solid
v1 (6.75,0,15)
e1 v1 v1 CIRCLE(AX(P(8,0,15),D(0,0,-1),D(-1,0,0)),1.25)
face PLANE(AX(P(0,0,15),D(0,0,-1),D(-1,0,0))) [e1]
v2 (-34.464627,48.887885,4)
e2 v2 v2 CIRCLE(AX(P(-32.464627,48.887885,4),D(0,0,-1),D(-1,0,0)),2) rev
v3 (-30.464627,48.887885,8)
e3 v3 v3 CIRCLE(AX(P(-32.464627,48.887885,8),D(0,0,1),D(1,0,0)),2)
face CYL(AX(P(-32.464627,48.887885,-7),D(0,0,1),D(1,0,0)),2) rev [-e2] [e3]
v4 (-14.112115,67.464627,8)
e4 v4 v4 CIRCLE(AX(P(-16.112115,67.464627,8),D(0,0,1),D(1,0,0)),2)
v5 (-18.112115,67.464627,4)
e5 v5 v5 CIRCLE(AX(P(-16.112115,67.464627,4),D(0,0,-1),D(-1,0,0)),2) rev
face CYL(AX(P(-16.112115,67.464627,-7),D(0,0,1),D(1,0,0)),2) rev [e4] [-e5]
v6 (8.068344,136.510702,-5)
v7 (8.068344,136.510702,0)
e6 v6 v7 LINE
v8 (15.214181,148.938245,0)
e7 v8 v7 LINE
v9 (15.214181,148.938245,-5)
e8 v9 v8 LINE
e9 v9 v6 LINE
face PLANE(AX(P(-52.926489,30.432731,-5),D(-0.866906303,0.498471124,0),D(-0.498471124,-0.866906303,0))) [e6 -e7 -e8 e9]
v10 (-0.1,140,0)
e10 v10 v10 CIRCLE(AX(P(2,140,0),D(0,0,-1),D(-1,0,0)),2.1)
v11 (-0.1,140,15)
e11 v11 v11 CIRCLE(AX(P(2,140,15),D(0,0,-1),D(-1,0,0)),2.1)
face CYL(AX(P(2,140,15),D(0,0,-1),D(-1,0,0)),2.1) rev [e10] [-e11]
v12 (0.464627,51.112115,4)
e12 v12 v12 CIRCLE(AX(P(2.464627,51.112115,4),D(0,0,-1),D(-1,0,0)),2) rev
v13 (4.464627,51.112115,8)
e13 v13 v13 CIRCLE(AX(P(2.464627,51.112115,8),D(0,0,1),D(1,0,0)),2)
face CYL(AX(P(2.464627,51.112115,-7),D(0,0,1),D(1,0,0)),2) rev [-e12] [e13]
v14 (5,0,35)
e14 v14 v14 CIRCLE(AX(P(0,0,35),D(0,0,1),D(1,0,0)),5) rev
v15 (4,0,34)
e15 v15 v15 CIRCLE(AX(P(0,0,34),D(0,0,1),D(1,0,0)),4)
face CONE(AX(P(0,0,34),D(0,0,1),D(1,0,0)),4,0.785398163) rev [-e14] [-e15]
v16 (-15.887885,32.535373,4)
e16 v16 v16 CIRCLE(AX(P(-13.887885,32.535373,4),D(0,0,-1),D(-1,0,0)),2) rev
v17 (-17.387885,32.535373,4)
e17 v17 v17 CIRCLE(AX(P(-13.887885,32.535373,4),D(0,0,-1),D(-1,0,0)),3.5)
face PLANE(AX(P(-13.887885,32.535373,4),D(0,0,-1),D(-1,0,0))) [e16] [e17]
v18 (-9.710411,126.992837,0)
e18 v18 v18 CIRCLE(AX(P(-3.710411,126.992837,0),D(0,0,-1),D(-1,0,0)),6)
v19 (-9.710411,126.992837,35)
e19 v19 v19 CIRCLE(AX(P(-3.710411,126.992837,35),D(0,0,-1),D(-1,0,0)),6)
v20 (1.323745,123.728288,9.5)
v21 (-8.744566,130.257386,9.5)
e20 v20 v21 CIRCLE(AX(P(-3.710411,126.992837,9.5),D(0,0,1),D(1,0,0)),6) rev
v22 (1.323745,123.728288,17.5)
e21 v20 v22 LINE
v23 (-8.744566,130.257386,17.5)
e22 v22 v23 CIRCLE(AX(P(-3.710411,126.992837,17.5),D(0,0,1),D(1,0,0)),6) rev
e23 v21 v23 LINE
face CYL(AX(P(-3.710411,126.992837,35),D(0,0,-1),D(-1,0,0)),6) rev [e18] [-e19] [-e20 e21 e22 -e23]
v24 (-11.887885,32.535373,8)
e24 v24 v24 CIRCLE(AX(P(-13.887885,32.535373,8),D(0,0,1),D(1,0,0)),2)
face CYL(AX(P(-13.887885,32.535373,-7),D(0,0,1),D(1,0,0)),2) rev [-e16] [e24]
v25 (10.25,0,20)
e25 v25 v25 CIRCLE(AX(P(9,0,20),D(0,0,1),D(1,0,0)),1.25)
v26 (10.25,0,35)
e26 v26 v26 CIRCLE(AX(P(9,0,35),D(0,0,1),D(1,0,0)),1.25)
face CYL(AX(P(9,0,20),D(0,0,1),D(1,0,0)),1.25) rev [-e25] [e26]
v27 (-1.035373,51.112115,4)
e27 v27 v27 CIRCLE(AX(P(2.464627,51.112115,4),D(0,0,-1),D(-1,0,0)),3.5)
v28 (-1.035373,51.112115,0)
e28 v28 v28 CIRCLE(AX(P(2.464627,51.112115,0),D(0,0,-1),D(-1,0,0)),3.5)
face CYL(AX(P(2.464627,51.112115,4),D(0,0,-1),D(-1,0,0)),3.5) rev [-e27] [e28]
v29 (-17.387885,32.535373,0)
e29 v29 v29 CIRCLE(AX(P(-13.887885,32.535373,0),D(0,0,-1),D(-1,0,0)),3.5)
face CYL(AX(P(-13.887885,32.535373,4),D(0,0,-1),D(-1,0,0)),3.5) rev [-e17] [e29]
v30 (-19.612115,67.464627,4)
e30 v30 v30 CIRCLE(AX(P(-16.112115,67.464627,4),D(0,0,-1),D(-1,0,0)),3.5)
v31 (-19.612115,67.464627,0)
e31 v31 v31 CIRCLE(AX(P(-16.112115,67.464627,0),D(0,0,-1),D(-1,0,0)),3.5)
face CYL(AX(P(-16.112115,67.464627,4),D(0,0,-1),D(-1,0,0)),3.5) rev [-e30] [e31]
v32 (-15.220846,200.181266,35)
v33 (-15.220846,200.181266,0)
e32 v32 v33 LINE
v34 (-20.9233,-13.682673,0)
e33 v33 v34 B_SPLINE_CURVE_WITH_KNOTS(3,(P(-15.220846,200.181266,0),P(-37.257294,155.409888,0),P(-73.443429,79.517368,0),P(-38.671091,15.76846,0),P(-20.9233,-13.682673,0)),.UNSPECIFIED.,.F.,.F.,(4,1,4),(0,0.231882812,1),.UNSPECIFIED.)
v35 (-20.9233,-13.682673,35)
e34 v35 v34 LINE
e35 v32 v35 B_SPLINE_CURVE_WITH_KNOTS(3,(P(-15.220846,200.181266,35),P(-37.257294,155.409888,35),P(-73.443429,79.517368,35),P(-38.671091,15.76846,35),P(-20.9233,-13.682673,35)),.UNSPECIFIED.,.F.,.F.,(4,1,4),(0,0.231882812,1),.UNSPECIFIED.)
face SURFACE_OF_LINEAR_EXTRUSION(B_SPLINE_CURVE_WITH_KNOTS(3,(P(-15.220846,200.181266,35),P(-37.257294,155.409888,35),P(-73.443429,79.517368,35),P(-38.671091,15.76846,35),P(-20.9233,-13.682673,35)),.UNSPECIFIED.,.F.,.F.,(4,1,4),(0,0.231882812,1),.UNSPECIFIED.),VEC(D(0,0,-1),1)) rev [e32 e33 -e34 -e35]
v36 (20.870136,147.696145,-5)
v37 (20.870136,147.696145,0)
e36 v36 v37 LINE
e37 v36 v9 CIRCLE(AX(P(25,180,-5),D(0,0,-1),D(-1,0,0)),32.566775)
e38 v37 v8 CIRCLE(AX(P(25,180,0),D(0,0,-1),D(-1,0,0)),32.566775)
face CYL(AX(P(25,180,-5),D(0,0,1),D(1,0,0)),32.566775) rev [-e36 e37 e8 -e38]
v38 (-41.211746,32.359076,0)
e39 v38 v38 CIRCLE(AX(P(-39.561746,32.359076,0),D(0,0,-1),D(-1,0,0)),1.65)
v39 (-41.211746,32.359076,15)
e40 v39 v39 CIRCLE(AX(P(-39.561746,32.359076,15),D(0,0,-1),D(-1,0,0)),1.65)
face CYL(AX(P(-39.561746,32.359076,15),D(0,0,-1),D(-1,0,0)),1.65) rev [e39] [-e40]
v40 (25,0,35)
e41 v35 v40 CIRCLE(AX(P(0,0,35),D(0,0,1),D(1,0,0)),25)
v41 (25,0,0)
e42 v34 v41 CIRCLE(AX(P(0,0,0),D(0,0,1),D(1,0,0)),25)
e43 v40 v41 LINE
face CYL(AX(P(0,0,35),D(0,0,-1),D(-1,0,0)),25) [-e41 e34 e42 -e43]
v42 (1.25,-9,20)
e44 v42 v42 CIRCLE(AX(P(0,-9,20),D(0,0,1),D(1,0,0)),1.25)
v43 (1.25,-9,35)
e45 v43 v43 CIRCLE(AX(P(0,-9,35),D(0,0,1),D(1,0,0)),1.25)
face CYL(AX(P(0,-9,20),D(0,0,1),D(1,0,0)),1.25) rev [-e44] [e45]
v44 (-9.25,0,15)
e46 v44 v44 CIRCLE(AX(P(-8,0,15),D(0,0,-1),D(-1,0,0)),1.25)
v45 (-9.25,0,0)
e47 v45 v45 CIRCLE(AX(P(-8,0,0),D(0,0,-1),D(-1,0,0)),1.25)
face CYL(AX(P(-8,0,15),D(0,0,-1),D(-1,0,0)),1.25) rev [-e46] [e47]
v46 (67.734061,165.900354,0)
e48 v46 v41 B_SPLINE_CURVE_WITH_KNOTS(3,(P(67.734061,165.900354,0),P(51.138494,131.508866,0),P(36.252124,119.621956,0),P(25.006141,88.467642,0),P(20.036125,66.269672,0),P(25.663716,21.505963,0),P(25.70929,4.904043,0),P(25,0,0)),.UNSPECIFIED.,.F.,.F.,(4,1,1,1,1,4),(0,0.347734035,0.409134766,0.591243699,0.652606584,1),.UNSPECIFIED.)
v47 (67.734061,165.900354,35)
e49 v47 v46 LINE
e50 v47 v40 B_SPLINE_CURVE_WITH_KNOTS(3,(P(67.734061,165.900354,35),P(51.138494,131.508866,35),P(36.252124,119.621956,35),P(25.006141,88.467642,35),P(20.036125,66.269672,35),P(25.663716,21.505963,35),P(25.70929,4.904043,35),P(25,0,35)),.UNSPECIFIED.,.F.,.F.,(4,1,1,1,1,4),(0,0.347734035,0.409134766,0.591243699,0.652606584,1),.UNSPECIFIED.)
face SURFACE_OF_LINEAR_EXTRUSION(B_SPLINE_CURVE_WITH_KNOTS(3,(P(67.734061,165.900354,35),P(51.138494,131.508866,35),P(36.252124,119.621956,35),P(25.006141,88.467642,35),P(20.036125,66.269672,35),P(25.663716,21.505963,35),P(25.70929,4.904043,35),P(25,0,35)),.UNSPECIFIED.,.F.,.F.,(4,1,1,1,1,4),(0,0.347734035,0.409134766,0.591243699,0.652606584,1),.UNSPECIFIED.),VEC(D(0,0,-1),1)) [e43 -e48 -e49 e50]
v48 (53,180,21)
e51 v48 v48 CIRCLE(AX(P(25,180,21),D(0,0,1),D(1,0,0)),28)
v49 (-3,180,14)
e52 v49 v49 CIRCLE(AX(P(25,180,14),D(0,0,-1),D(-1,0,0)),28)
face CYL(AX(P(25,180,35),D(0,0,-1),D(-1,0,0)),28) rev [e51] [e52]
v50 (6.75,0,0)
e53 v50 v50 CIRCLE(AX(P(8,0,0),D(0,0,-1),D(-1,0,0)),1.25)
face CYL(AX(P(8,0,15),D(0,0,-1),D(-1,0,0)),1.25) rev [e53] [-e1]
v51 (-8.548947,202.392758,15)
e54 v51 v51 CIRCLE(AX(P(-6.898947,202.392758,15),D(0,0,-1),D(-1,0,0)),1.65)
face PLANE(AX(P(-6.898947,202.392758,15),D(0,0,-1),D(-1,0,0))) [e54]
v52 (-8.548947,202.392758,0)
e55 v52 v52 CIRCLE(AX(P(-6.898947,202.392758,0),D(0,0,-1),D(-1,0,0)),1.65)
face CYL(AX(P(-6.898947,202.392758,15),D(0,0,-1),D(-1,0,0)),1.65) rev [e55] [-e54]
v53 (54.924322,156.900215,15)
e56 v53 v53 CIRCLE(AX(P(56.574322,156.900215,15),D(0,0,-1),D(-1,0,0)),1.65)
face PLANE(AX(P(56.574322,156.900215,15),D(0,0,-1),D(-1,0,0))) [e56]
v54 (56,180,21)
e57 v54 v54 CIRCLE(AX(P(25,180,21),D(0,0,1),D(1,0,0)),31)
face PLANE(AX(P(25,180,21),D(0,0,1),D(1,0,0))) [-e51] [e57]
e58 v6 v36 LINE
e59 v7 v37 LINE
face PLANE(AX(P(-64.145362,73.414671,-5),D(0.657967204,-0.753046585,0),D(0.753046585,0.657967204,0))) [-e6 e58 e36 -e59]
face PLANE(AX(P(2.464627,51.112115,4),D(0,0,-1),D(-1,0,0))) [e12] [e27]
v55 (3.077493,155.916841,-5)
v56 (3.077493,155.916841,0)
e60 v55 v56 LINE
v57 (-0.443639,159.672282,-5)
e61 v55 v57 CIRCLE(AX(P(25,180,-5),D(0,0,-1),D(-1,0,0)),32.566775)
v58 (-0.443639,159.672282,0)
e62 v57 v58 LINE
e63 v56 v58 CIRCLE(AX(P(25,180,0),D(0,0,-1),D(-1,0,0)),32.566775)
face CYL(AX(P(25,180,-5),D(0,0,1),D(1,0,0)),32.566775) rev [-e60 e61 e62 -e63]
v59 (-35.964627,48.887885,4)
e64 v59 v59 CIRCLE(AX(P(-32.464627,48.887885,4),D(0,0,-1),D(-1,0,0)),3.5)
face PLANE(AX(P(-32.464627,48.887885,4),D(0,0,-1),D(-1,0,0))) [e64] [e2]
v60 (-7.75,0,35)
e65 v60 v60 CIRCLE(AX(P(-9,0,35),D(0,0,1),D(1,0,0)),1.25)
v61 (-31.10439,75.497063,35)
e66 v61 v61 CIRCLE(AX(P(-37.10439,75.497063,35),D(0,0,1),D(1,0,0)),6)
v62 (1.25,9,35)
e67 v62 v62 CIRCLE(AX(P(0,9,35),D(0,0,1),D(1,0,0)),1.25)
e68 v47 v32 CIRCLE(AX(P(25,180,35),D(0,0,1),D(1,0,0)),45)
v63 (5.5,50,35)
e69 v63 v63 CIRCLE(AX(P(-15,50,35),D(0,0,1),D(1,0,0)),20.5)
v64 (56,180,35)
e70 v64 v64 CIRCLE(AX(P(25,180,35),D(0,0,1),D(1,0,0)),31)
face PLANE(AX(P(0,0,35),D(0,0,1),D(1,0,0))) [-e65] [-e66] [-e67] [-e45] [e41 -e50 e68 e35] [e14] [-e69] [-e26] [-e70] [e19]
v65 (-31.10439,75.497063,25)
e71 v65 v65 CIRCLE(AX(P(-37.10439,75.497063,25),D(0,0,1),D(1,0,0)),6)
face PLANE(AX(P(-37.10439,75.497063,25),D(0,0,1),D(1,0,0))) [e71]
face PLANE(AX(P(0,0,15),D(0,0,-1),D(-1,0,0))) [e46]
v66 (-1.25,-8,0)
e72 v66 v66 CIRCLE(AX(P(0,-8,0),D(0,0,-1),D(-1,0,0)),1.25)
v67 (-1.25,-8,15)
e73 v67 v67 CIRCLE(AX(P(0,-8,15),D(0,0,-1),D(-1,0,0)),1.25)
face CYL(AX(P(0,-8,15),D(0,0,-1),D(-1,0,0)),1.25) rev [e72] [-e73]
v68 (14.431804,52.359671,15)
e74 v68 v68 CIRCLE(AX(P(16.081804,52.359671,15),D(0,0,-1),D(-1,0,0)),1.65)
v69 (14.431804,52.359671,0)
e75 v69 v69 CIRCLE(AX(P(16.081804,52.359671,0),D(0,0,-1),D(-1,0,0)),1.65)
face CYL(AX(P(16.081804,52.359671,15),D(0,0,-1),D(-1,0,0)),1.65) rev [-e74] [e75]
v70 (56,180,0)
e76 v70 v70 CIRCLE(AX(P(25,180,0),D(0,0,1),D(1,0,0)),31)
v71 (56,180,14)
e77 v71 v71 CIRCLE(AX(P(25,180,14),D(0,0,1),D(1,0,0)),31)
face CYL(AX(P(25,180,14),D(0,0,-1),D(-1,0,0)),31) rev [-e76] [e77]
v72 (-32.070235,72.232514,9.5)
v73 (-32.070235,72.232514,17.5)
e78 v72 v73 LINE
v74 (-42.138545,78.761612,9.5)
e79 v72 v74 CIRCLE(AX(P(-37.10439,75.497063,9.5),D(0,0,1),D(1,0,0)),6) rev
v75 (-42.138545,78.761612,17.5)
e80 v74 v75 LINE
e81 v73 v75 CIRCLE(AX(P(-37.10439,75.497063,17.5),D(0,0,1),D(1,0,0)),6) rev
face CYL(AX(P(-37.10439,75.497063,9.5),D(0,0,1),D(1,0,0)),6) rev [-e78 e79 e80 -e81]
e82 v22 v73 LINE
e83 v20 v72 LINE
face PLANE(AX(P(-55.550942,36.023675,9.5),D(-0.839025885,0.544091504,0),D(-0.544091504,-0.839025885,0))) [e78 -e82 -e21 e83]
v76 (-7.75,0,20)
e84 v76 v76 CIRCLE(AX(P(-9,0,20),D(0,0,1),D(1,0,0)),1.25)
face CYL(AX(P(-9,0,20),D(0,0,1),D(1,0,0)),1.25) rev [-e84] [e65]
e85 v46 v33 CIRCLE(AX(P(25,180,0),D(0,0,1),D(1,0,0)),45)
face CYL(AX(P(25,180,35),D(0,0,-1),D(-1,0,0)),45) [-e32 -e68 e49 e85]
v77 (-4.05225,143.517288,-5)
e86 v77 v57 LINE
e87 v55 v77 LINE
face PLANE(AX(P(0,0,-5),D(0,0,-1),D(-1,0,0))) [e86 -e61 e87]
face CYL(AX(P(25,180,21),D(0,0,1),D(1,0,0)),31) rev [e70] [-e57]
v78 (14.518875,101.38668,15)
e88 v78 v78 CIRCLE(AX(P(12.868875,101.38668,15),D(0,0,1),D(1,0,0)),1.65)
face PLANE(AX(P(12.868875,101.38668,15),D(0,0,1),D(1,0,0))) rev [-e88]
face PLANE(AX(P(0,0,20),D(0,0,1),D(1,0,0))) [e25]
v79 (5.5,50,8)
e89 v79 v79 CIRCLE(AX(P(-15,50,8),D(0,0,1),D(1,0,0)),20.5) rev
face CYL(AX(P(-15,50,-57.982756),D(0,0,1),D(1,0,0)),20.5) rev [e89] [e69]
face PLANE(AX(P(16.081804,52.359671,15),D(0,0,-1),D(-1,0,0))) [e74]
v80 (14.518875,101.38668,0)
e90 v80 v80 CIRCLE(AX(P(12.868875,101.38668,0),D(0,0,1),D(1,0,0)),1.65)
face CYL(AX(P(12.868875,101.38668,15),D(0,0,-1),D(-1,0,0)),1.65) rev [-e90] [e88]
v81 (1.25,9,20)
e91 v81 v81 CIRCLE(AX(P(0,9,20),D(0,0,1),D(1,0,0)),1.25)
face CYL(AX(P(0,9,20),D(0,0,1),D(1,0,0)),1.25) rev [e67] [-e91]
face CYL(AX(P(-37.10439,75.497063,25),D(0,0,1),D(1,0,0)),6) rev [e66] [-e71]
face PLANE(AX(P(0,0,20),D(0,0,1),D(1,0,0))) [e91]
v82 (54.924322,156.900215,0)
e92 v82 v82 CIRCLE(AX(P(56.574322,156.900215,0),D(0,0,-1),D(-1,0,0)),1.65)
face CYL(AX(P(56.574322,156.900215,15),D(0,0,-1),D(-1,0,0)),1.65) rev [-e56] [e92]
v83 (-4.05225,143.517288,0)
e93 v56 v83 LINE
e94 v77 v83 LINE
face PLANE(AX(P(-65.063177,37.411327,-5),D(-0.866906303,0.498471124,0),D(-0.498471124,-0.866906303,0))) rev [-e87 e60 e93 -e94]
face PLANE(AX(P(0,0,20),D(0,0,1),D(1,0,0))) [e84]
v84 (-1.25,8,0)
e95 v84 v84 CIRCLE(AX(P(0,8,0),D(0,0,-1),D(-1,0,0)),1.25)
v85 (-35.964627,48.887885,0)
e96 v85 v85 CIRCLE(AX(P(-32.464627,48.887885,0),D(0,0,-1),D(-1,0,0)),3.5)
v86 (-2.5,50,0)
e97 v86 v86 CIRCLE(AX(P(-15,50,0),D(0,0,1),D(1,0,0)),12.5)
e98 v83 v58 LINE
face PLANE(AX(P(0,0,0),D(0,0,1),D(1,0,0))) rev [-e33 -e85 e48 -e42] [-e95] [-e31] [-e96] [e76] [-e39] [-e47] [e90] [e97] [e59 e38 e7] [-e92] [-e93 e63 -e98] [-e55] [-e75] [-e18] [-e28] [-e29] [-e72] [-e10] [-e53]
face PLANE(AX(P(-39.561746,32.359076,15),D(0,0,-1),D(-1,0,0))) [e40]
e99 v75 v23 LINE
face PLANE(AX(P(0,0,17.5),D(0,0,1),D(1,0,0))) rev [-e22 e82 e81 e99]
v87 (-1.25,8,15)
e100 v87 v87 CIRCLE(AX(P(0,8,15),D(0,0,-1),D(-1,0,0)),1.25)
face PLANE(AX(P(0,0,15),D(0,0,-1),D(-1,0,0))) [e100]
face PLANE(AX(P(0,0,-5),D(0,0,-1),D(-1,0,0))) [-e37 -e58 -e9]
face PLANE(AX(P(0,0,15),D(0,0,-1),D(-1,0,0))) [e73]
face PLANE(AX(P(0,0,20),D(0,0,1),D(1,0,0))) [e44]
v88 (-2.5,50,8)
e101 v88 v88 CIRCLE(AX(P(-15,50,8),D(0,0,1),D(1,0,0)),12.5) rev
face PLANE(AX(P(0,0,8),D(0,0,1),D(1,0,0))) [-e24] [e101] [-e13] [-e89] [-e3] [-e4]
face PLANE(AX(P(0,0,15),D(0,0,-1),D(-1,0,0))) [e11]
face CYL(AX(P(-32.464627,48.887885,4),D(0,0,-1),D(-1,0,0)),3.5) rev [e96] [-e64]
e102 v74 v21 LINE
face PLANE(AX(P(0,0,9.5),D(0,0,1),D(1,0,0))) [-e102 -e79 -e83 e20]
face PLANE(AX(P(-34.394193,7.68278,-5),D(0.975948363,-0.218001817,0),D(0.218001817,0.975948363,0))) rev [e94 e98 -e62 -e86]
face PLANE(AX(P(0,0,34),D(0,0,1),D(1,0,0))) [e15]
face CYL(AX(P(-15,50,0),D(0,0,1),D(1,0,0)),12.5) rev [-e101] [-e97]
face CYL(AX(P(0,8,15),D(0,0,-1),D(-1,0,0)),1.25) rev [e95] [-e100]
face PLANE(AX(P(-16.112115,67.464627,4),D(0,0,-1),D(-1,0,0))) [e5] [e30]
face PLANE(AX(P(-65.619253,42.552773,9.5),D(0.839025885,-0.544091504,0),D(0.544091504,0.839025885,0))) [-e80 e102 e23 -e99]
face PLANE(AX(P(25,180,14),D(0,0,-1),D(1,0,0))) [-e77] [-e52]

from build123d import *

# Parameters (mm, degrees)
SKIZZE1_R                        = 9
SKIZZE1_R_2                      = 28
AUFSATZ_LINEAR_AUSTRAGEN1_DEPTH  = 35
SKIZZE2_R                        = 4
SCHNITT_LINEAR_AUSTRAGEN1_DEPTH  = 1
FASE1_SIZE                       = 1
SKIZZE4_R                        = 1.25
SCHNITT_LINEAR_AUSTRAGEN2_DEPTH  = 15
SKIZZE5_R                        = 1.25
SCHNITT_LINEAR_AUSTRAGEN3_DEPTH  = 15
SKIZZE6_R                        = 12.5
SCHNITT_LINEAR_AUSTRAGEN4_DEPTH  = 35
SKIZZE7_R                        = 20.5
SCHNITT_LINEAR_AUSTRAGEN5_DEPTH  = 27
SKIZZE8_R                        = 2
SCHNITT_LINEAR_AUSTRAGEN6_DEPTH  = 15
SKIZZE9_R                        = 3.5
SCHNITT_LINEAR_AUSTRAGEN7_DEPTH  = 4
SKIZZE10_R                       = 31
SCHNITT_LINEAR_AUSTRAGEN8_DEPTH  = 14
SKIZZE11_R                       = 1.65
SCHNITT_LINEAR_AUSTRAGEN10_DEPTH = 15
SKIZZE12_R                       = 2.1
SCHNITT_LINEAR_AUSTRAGEN11_DEPTH = 15
BOSS_EXTRUDE1_DEPTH              = 5
SKETCH2_R                        = 6
CUT_EXTRUDE1_DEPTH               = 35
CUT_EXTRUDE2_START               = 8
SKETCH3_R                        = 6
CUT_EXTRUDE2_DEPTH               = 8
CUT_EXTRUDE3_START               = -10
SKETCH4_R                        = 6
CUT_EXTRUDE3_DEPTH               = 10
SKIZZE13_R                       = 1.65
SCHNITT_LINEAR_AUSTRAGEN12_DEPTH = 15


with BuildPart() as part:
    # Skizze1 → Aufsatz-Linear austragen1 (new body)
    # profile 1 of 4: a face of its own
    with BuildSketch(Plane.XY):
        with BuildLine():
            add(Edge.make_bspline(
                [(-21.90615173, -12.046597711), (-21.575742026, -12.598438537), (-21.248020936, -13.143822016), (-20.923299769, -13.682672501)],
                knots=[0.9859462, 0.9859462, 0.9859462, 0.9859462, 1, 1, 1, 1], degree=3))
            ThreePointArc((-20.923299769, -13.682672501), (7.138539969, -23.959157897), (25, 0))
            ThreePointArc((25, 0), (-6.218770247, 24.21418792), (-21.90615173, -12.046597711))
        make_face()
        Circle(SKIZZE1_R, mode=Mode.SUBTRACT)
    # profile 2 of 4: a face of its own
    with BuildSketch(Plane.XY):
        Circle(SKIZZE1_R)
    # profile 3 of 4: a face of its own
    with BuildSketch(Plane.XY):
        with BuildLine():
            ThreePointArc((-21.90615173, -12.046597711), (-6.218770247, 24.21418792), (25, 0))
            add(Edge.make_bspline(
                [(61.420827626, 153.570408345), (47.913273557, 128.743473036), (35.386108163, 117.222864261), (25.006140509, 88.46764169), (20.036125276, 66.269671918), (25.663716119, 21.50596296), (25.709290114, 4.90404347), (25, 0)],
                knots=[0.045529733, 0.045529733, 0.045529733, 0.045529733, 0.347734035, 0.409134766, 0.591243699, 0.652606584, 1, 1, 1, 1], degree=3))
            ThreePointArc((61.420827626, 153.570408345), (1.91364242, 141.373324067), (-15.526505959, 199.560222769))
            add(Edge.make_bspline(
                [(-15.526505959, 199.560222769), (-37.33502728, 155.24670183), (-72.898560815, 80.515220187), (-39.634443124, 17.562686966), (-21.90615173, -12.046597711)],
                knots=[0.001075204, 0.001075204, 0.001075204, 0.001075204, 0.231882812, 0.9859462, 0.9859462, 0.9859462, 0.9859462], degree=3))
        make_face()
    # profile 4 of 4: a face of its own
    with BuildSketch(Plane.XY):
        with BuildLine():
            ThreePointArc((-15.526505959, 199.560222769), (1.91364242, 141.373324067), (61.420827626, 153.570408345))
            add(Edge.make_bspline(
                [(67.734061127, 165.90035392), (65.561159832, 161.397385892), (63.455859297, 157.310804229), (61.420827626, 153.570408345)],
                knots=[0, 0, 0, 0, 0.045529733, 0.045529733, 0.045529733, 0.045529733], degree=3))
            ThreePointArc((67.734061127, 165.90035392), (69.429904067, 172.859718168), (70, 180))
            ThreePointArc((70, 180), (35.369713301, 223.788914648), (-15.220846491, 200.181266251))
            add(Edge.make_bspline(
                [(-15.220846491, 200.181266251), (-15.323026036, 199.973668406), (-15.424912199, 199.766654794), (-15.526505959, 199.560222769)],
                knots=[0, 0, 0, 0, 0.001075204, 0.001075204, 0.001075204, 0.001075204], degree=3))
        make_face()
        with Locations((25, 180)):
            Circle(SKIZZE1_R_2, mode=Mode.SUBTRACT)
    extrude(amount=AUFSATZ_LINEAR_AUSTRAGEN1_DEPTH)

    # Skizze2 → Schnitt-Linear austragen1 (cut)
    with BuildSketch(Plane.XY.offset(35)):
        Circle(SKIZZE2_R)
    extrude(amount=-SCHNITT_LINEAR_AUSTRAGEN1_DEPTH, mode=Mode.SUBTRACT)

    # Fase1
    fase1_edges = [part.edges().sort_by_distance(p)[0] for p in [
        (-4, 0, 35),
    ]]
    chamfer(fase1_edges, length=FASE1_SIZE - 0.0001)  # a hair under: the kernel refuses the full size

    # Skizze4 → Schnitt-Linear austragen2 (cut)
    with BuildSketch(Plane.XY.offset(35)):
        with Locations((0, 9)):
            Circle(SKIZZE4_R)
        with Locations((9, 0)):
            Circle(SKIZZE4_R)
        with Locations((0, -9)):
            Circle(SKIZZE4_R)
        with Locations((-9, 0)):
            Circle(SKIZZE4_R)
    extrude(amount=-SCHNITT_LINEAR_AUSTRAGEN2_DEPTH, mode=Mode.SUBTRACT)

    # Skizze5 → Schnitt-Linear austragen3 (cut)
    with BuildSketch(Plane(origin=(0, 0, 0), x_dir=(-1, 0, 0), z_dir=(0, 0, -1))):
        with Locations((8, 0)):
            Circle(SKIZZE5_R)
        with Locations((0, -8)):
            Circle(SKIZZE5_R)
        with Locations((-8, 0)):
            Circle(SKIZZE5_R)
        with Locations((0, 8)):
            Circle(SKIZZE5_R)
    extrude(amount=-SCHNITT_LINEAR_AUSTRAGEN3_DEPTH, mode=Mode.SUBTRACT)

    # Skizze6 → Schnitt-Linear austragen4 (cut)
    with BuildSketch(Plane.XY.offset(35)):
        with Locations((-15, 50)):
            Circle(SKIZZE6_R)
    extrude(amount=-SCHNITT_LINEAR_AUSTRAGEN4_DEPTH, mode=Mode.SUBTRACT)

    # Skizze7 → Schnitt-Linear austragen5 (cut)
    with BuildSketch(Plane.XY.offset(35)):
        with Locations((-15, 50)):
            Circle(SKIZZE7_R)
    extrude(amount=-SCHNITT_LINEAR_AUSTRAGEN5_DEPTH, mode=Mode.SUBTRACT)

    # Skizze8 → Schnitt-Linear austragen6 (cut)
    with BuildSketch(Plane.XY.offset(8)):
        with Locations((2.46462713, 51.112114754)):
            Circle(SKIZZE8_R)
        with Locations((-16.112114754, 67.46462713)):
            Circle(SKIZZE8_R)
        with Locations((-13.887885246, 32.53537287)):
            Circle(SKIZZE8_R)
        with Locations((-32.46462713, 48.887885246)):
            Circle(SKIZZE8_R)
    extrude(amount=-SCHNITT_LINEAR_AUSTRAGEN6_DEPTH, mode=Mode.SUBTRACT)

    # Skizze9 → Schnitt-Linear austragen7 (cut)
    with BuildSketch(Plane(origin=(0, 0, 0), x_dir=(-1, 0, 0), z_dir=(0, 0, -1))):
        with Locations((13.887885246, 32.53537287)):
            Circle(SKIZZE9_R)
        with Locations((-2.46462713, 51.112114754)):
            Circle(SKIZZE9_R)
        with Locations((16.112114754, 67.46462713)):
            Circle(SKIZZE9_R)
        with Locations((32.46462713, 48.887885246)):
            Circle(SKIZZE9_R)
    extrude(amount=-SCHNITT_LINEAR_AUSTRAGEN7_DEPTH, mode=Mode.SUBTRACT)

    # Skizze10 → Schnitt-Linear austragen8 (cut)
    with BuildSketch(Plane.XY.offset(35)):
        with Locations((25, 180)):
            Circle(SKIZZE10_R)
    schnitt_linear_austragen8 = extrude(amount=-SCHNITT_LINEAR_AUSTRAGEN8_DEPTH, mode=Mode.SUBTRACT)

    # Spiegeln1: Schnitt-Linear austragen8 across plane
    add(schnitt_linear_austragen8.mirror(Plane.XY.offset(17.5)), mode=Mode.SUBTRACT)

    # Skizze11 → Schnitt-Linear austragen10 (cut)
    with BuildSketch(Plane.XY):
        with Locations((12.868875195, 101.386680064)):
            Circle(SKIZZE11_R)
    extrude(amount=SCHNITT_LINEAR_AUSTRAGEN10_DEPTH, mode=Mode.SUBTRACT)

    # Skizze12 → Schnitt-Linear austragen11 (cut)
    with BuildSketch(Plane(origin=(0, 0, 0), x_dir=(-1, 0, 0), z_dir=(0, 0, -1))):
        with Locations((-2, 140)):
            Circle(SKIZZE12_R)
    extrude(amount=-SCHNITT_LINEAR_AUSTRAGEN11_DEPTH, mode=Mode.SUBTRACT)

    # Sketch1 → Boss-Extrude1 (add)
    with BuildSketch(Plane(origin=(0, 0, 0), x_dir=(-1, 0, 0), z_dir=(0, 0, -1))):
        with BuildLine():
            Line((-8.068344121, 136.51070213), (-15.214181441, 148.938245296))
            ThreePointArc((-15.214181441, 148.938245296), (-18.014496555, 148.191234041), (-20.870136061, 147.696144595))
            Line((-20.870136061, 147.696144595), (-8.068344121, 136.51070213))
        make_face()
        with BuildLine():
            ThreePointArc((0.443638721, 159.672282499), (-1.242605981, 157.724877562), (-3.077493199, 155.916841035))
            Line((-3.077493199, 155.916841035), (4.052249922, 143.517287782))
            Line((4.052249922, 143.517287782), (0.443638721, 159.672282499))
        make_face()
    extrude(amount=BOSS_EXTRUDE1_DEPTH)

    # Sketch2 → Cut-Extrude1 (cut)
    with BuildSketch(Plane(origin=(0, 0, 0), x_dir=(-1, 0, 0), z_dir=(0, 0, -1))):
        with Locations((3.710410677, 126.992836719)):
            Circle(SKETCH2_R)
    extrude(amount=-CUT_EXTRUDE1_DEPTH, mode=Mode.SUBTRACT)

    # Sketch3 → Cut-Extrude2 (cut)
    with BuildSketch(Plane(origin=(0, 0, 17.5), x_dir=(-1, 0, 0), z_dir=(0, 0, -1)).offset(CUT_EXTRUDE2_START)):
        with BuildLine():
            ThreePointArc((32.070234604, 72.232513918), (33.839840892, 80.53121825), (42.138545224, 78.761611961))
            Line((42.138545224, 78.761611961), (8.744565987, 130.257385741))
            ThreePointArc((8.744565987, 130.257385741), (9.463884926, 128.69505118), (9.710410677, 126.992836719))
            ThreePointArc((9.710410677, 126.992836719), (5.412625137, 121.23936247), (-1.323744633, 123.728287698))
            Line((-1.323744633, 123.728287698), (32.070234604, 72.232513918))
        make_face()
        with Locations((37.104389914, 75.497062939)):
            Circle(SKETCH3_R)
    extrude(amount=-CUT_EXTRUDE2_DEPTH, mode=Mode.SUBTRACT)

    # Sketch4 → Cut-Extrude3 (cut)
    with BuildSketch(Plane.XY.offset(35).offset(CUT_EXTRUDE3_START)):
        with Locations((-37.104389914, 75.497062939)):
            Circle(SKETCH4_R)
    extrude(amount=CUT_EXTRUDE3_DEPTH, mode=Mode.SUBTRACT)

    # Skizze13 → Schnitt-Linear austragen12 (cut)
    with BuildSketch(Plane(origin=(0, 0, 0), x_dir=(-1, 0, 0), z_dir=(0, 0, -1))):
        with Locations((-56.574321758, 156.900214998)):
            Circle(SKIZZE13_R)
        with Locations((6.898947223, 202.392758189)):
            Circle(SKIZZE13_R)
        with Locations((39.561746336, 32.359075962)):
            Circle(SKIZZE13_R)
        with Locations((-16.081803595, 52.359670818)):
            Circle(SKIZZE13_R)
    extrude(amount=-SCHNITT_LINEAR_AUSTRAGEN12_DEPTH, mode=Mode.SUBTRACT)


solid = part.part
